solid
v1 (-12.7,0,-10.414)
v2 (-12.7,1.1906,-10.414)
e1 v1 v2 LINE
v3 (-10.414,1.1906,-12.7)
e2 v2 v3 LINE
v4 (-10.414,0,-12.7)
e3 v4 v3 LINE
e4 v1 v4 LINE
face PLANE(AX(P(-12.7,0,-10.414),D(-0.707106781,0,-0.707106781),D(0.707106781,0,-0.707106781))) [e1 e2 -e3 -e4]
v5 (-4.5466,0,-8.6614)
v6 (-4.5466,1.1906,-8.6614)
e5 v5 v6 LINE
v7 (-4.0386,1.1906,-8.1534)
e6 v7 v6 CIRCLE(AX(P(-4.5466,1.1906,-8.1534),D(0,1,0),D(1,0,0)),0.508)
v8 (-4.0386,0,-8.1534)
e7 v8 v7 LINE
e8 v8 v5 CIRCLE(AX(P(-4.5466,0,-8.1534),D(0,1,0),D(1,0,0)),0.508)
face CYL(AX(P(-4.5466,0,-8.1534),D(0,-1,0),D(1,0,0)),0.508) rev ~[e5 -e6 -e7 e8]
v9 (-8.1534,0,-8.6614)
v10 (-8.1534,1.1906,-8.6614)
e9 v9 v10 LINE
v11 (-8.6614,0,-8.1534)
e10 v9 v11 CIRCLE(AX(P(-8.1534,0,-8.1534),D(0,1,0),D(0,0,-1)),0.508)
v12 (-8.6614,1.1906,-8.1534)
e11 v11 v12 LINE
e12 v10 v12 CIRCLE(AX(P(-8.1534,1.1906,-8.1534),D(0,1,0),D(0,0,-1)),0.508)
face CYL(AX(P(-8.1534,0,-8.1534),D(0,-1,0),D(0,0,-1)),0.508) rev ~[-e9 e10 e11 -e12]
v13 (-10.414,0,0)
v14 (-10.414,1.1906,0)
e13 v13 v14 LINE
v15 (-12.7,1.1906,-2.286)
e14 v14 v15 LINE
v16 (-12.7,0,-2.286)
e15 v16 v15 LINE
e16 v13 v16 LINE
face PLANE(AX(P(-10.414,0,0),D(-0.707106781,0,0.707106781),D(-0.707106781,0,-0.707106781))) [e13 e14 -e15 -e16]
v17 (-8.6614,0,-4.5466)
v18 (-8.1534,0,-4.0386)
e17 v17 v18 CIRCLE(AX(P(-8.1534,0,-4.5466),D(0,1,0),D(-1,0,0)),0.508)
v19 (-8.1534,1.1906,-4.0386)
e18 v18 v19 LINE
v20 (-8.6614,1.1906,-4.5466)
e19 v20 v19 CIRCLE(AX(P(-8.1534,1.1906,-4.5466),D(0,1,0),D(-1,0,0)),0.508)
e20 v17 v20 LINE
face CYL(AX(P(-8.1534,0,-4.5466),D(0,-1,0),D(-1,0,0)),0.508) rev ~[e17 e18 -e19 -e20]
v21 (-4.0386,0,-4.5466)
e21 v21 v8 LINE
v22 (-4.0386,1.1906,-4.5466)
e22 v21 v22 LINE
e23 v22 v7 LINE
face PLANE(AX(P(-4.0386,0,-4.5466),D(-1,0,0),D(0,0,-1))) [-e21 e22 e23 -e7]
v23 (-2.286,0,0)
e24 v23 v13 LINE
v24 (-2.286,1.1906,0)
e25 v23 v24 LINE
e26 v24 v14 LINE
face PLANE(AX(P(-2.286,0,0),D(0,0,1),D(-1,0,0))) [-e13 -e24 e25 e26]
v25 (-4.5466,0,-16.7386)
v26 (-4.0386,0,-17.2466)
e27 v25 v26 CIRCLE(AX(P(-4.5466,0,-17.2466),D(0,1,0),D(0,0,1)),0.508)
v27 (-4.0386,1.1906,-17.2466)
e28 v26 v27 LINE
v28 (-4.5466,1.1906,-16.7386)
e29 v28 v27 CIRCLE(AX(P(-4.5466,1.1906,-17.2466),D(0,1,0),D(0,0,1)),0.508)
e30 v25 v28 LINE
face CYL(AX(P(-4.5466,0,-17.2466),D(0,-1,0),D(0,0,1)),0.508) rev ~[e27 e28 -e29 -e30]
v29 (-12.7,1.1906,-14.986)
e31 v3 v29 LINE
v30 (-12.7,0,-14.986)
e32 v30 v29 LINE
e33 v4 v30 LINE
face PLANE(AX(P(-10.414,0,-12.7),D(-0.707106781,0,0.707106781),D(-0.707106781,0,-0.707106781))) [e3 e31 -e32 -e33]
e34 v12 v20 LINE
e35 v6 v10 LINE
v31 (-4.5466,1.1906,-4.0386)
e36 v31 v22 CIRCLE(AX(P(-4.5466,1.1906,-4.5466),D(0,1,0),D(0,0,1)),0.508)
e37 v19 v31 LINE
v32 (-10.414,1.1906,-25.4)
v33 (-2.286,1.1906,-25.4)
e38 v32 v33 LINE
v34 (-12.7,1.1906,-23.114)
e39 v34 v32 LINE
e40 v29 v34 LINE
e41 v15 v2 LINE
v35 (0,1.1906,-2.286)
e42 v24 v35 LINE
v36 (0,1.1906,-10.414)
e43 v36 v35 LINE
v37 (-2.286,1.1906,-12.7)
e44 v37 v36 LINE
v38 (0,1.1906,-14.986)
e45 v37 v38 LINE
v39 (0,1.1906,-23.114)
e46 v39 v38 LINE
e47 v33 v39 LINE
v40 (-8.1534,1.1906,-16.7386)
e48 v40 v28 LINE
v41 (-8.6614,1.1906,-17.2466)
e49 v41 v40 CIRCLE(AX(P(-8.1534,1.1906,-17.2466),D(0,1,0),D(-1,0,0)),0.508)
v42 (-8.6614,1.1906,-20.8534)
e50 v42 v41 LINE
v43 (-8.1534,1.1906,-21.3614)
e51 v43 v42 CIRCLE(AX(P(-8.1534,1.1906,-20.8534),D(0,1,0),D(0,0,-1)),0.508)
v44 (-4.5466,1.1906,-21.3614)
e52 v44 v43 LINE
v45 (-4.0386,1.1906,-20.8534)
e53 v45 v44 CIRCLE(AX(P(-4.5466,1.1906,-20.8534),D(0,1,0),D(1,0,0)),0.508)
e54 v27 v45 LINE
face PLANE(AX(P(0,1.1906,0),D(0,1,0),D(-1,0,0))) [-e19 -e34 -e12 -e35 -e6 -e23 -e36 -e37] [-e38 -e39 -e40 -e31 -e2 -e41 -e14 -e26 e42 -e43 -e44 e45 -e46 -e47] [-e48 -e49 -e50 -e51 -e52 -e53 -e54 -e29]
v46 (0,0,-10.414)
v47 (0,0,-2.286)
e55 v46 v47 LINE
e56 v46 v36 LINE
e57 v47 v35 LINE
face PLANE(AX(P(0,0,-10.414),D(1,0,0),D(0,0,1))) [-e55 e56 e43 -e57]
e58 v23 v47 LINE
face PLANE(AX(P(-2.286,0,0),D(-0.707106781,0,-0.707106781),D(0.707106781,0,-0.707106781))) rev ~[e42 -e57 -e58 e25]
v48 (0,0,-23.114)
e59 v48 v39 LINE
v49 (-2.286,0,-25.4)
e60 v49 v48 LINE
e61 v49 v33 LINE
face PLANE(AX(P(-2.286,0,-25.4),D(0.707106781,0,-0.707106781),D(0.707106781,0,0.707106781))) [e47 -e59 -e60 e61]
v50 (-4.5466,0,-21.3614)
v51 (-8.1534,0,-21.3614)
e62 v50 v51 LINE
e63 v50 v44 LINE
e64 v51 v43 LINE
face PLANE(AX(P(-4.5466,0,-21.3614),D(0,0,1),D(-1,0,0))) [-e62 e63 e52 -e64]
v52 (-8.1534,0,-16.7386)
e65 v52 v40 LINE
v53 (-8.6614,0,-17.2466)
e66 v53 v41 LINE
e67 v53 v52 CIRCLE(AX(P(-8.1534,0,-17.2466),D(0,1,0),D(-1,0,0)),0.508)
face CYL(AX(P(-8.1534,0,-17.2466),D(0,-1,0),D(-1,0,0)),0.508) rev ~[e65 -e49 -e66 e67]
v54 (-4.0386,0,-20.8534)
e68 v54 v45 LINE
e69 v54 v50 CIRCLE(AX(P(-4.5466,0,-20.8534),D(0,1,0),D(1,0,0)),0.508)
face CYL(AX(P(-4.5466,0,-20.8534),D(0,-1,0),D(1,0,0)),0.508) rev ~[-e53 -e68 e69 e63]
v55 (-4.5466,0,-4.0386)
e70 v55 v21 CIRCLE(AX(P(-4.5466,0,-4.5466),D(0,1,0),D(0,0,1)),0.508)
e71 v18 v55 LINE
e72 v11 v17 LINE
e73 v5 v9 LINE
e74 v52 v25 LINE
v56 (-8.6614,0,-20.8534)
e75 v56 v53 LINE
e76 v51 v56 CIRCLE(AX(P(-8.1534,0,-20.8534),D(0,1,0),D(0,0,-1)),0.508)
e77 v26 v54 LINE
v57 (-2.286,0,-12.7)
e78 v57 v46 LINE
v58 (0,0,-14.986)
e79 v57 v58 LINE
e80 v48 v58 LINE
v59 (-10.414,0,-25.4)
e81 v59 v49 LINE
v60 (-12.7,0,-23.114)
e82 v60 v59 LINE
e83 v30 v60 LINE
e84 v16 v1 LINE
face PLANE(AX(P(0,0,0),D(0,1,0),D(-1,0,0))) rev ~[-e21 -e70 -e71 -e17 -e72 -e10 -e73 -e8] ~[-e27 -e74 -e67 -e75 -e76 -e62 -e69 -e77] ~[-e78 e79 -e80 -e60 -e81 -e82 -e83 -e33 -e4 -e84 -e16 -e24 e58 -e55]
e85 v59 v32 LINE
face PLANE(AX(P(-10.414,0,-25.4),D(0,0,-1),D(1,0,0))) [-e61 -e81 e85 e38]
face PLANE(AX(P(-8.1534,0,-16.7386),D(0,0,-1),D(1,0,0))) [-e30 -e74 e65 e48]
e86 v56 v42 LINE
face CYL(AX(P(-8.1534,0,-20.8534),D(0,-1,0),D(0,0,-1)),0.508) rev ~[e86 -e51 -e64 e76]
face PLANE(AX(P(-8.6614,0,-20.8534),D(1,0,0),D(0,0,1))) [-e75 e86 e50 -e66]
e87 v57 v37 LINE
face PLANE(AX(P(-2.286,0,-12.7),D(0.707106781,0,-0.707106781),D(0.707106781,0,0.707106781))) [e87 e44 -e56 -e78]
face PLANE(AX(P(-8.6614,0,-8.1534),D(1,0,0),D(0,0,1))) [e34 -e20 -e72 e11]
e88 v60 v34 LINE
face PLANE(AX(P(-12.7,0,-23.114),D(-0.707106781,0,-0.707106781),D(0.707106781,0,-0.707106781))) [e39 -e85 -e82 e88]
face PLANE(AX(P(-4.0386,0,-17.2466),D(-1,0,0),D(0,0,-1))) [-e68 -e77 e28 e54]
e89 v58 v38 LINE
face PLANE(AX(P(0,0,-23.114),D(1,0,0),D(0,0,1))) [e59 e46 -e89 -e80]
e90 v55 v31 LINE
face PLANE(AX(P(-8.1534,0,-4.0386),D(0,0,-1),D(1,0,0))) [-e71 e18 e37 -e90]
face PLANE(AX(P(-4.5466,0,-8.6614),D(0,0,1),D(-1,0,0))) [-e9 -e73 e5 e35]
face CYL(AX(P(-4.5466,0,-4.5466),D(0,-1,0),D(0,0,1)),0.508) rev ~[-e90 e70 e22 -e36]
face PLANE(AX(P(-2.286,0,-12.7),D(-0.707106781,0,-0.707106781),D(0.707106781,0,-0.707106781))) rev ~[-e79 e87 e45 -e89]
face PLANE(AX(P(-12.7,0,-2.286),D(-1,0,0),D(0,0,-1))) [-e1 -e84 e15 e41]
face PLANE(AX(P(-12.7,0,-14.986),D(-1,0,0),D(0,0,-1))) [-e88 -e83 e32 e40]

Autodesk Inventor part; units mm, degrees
ref_plane "YZ Plane" through (0, 0, 0) normal (1, 0, 0) x (0, 1, 0)
ref_plane "XZ Plane" through (0, 0, 0) normal (0, 1, 0) x (-1, 0, 0)
ref_plane "XY Plane" through (0, 0, 0) normal (0, 0, 1) x (1, 0, 0)
sketch "Sketch1" plane through (0, 0, 0) normal (0, 1, 0) x (-1, 0, 0)
  line L0 (2.286, 0) -> (10.414, 0)
  line L1 (12.7, -2.286) -> (12.7, -10.414)
  line L2 (10.414, -12.7) -> (2.286, -12.7)
  line L3 (0, -10.414) -> (0, -2.286)
  line L4 (8.1534, -4.0386) -> (4.5466, -4.0386)
  line L5 (4.0386, -4.5466) -> (4.0386, -8.1534)
  line L6 (4.5466, -8.6614) -> (8.1534, -8.6614)
  line L7 (8.6614, -8.1534) -> (8.6614, -4.5466)
  line L8 (10.414, 0) -> (12.7, -2.286)
  line L9 (12.7, -10.414) -> (10.414, -12.7)
  line L10 (2.286, -12.7) -> (0, -10.414)
  line L11 (2.286, 0) -> (0, -2.286)
  arc A0 (8.6614, -4.5466) -> (8.1534, -4.0386) centre (8.1534, -4.5466) ccw
  arc A1 (8.1534, -8.6614) -> (8.6614, -8.1534) centre (8.1534, -8.1534) ccw
  arc A2 (4.0386, -8.1534) -> (4.5466, -8.6614) centre (4.5466, -8.1534) ccw
  arc A3 (4.5466, -4.0386) -> (4.0386, -4.5466) centre (4.5466, -4.5466) ccw
  line L12 (8.1534, -4.5466) -> (4.5466, -8.1534) construction
  line L13 (12.7, -10.414) -> (0, -2.286) construction
  point P0 (0, 0)
  point P1 (12.7, -12.7)
  point P2 (12.7, 0)
  point P3 (0, -12.7)
  point P4 (4.0386, -8.6614)
  point P5 (8.6614, -8.6614)
  point P6 (6.35, -6.35)
  dimension "d1" = 12.7
  dimension "d2" = 4.6228
  dimension "d3" = 2.286
  dimension "d4" = 2.286
  dimension "d5" = 2.286
  dimension "d6" = 2.286
  dimension "d7" = 2.286
  dimension "d8" = 2.286
  dimension "d9" = 2.286
  dimension "d10" = 2.286
  dimension "d11" = 0.508
extrude "Body" add sketch "Sketch1" along normal blind 1.1906
sketch "Sketch2" plane through (0, 1.1906, 0) normal (0, 1, 0) x (1, 0, 0)
  arc A0 (-8.1534, 8.6614) -> (-8.6614, 8.1534) centre (-8.1534, 8.1534) ccw construction
  arc A1 (-4.5466, 4.0386) -> (-4.0386, 4.5466) centre (-4.5466, 4.5466) ccw construction
  circle A2 centre (-6.35, 6.35) radius 2.1844
  line L0 (-8.1534, 8.1534) -> (-4.5466, 4.5466) construction
  point P0 (0, 0)
  dimension "d14" = 4.3688
surface extrude "Circle" sketch "Sketch2" against normal up to surface (1.1906 mm away) shown yes curves A2
pattern_linear "Rectangular Pattern1" count 2 spacing 12.7 along (0, 0, -1) of "Body", "Circle"
equation "\"d4\" = d3"
equation "\"d5\" = d3"
equation "\"d6\" = d5"
equation "\"d7\" = d3"
equation "\"d8\" = d7"
equation "\"d9\" = d3"
equation "\"d10\" = d9"
equation "\"d22\" = d19"
equation "\"d19\" = 12.7"
